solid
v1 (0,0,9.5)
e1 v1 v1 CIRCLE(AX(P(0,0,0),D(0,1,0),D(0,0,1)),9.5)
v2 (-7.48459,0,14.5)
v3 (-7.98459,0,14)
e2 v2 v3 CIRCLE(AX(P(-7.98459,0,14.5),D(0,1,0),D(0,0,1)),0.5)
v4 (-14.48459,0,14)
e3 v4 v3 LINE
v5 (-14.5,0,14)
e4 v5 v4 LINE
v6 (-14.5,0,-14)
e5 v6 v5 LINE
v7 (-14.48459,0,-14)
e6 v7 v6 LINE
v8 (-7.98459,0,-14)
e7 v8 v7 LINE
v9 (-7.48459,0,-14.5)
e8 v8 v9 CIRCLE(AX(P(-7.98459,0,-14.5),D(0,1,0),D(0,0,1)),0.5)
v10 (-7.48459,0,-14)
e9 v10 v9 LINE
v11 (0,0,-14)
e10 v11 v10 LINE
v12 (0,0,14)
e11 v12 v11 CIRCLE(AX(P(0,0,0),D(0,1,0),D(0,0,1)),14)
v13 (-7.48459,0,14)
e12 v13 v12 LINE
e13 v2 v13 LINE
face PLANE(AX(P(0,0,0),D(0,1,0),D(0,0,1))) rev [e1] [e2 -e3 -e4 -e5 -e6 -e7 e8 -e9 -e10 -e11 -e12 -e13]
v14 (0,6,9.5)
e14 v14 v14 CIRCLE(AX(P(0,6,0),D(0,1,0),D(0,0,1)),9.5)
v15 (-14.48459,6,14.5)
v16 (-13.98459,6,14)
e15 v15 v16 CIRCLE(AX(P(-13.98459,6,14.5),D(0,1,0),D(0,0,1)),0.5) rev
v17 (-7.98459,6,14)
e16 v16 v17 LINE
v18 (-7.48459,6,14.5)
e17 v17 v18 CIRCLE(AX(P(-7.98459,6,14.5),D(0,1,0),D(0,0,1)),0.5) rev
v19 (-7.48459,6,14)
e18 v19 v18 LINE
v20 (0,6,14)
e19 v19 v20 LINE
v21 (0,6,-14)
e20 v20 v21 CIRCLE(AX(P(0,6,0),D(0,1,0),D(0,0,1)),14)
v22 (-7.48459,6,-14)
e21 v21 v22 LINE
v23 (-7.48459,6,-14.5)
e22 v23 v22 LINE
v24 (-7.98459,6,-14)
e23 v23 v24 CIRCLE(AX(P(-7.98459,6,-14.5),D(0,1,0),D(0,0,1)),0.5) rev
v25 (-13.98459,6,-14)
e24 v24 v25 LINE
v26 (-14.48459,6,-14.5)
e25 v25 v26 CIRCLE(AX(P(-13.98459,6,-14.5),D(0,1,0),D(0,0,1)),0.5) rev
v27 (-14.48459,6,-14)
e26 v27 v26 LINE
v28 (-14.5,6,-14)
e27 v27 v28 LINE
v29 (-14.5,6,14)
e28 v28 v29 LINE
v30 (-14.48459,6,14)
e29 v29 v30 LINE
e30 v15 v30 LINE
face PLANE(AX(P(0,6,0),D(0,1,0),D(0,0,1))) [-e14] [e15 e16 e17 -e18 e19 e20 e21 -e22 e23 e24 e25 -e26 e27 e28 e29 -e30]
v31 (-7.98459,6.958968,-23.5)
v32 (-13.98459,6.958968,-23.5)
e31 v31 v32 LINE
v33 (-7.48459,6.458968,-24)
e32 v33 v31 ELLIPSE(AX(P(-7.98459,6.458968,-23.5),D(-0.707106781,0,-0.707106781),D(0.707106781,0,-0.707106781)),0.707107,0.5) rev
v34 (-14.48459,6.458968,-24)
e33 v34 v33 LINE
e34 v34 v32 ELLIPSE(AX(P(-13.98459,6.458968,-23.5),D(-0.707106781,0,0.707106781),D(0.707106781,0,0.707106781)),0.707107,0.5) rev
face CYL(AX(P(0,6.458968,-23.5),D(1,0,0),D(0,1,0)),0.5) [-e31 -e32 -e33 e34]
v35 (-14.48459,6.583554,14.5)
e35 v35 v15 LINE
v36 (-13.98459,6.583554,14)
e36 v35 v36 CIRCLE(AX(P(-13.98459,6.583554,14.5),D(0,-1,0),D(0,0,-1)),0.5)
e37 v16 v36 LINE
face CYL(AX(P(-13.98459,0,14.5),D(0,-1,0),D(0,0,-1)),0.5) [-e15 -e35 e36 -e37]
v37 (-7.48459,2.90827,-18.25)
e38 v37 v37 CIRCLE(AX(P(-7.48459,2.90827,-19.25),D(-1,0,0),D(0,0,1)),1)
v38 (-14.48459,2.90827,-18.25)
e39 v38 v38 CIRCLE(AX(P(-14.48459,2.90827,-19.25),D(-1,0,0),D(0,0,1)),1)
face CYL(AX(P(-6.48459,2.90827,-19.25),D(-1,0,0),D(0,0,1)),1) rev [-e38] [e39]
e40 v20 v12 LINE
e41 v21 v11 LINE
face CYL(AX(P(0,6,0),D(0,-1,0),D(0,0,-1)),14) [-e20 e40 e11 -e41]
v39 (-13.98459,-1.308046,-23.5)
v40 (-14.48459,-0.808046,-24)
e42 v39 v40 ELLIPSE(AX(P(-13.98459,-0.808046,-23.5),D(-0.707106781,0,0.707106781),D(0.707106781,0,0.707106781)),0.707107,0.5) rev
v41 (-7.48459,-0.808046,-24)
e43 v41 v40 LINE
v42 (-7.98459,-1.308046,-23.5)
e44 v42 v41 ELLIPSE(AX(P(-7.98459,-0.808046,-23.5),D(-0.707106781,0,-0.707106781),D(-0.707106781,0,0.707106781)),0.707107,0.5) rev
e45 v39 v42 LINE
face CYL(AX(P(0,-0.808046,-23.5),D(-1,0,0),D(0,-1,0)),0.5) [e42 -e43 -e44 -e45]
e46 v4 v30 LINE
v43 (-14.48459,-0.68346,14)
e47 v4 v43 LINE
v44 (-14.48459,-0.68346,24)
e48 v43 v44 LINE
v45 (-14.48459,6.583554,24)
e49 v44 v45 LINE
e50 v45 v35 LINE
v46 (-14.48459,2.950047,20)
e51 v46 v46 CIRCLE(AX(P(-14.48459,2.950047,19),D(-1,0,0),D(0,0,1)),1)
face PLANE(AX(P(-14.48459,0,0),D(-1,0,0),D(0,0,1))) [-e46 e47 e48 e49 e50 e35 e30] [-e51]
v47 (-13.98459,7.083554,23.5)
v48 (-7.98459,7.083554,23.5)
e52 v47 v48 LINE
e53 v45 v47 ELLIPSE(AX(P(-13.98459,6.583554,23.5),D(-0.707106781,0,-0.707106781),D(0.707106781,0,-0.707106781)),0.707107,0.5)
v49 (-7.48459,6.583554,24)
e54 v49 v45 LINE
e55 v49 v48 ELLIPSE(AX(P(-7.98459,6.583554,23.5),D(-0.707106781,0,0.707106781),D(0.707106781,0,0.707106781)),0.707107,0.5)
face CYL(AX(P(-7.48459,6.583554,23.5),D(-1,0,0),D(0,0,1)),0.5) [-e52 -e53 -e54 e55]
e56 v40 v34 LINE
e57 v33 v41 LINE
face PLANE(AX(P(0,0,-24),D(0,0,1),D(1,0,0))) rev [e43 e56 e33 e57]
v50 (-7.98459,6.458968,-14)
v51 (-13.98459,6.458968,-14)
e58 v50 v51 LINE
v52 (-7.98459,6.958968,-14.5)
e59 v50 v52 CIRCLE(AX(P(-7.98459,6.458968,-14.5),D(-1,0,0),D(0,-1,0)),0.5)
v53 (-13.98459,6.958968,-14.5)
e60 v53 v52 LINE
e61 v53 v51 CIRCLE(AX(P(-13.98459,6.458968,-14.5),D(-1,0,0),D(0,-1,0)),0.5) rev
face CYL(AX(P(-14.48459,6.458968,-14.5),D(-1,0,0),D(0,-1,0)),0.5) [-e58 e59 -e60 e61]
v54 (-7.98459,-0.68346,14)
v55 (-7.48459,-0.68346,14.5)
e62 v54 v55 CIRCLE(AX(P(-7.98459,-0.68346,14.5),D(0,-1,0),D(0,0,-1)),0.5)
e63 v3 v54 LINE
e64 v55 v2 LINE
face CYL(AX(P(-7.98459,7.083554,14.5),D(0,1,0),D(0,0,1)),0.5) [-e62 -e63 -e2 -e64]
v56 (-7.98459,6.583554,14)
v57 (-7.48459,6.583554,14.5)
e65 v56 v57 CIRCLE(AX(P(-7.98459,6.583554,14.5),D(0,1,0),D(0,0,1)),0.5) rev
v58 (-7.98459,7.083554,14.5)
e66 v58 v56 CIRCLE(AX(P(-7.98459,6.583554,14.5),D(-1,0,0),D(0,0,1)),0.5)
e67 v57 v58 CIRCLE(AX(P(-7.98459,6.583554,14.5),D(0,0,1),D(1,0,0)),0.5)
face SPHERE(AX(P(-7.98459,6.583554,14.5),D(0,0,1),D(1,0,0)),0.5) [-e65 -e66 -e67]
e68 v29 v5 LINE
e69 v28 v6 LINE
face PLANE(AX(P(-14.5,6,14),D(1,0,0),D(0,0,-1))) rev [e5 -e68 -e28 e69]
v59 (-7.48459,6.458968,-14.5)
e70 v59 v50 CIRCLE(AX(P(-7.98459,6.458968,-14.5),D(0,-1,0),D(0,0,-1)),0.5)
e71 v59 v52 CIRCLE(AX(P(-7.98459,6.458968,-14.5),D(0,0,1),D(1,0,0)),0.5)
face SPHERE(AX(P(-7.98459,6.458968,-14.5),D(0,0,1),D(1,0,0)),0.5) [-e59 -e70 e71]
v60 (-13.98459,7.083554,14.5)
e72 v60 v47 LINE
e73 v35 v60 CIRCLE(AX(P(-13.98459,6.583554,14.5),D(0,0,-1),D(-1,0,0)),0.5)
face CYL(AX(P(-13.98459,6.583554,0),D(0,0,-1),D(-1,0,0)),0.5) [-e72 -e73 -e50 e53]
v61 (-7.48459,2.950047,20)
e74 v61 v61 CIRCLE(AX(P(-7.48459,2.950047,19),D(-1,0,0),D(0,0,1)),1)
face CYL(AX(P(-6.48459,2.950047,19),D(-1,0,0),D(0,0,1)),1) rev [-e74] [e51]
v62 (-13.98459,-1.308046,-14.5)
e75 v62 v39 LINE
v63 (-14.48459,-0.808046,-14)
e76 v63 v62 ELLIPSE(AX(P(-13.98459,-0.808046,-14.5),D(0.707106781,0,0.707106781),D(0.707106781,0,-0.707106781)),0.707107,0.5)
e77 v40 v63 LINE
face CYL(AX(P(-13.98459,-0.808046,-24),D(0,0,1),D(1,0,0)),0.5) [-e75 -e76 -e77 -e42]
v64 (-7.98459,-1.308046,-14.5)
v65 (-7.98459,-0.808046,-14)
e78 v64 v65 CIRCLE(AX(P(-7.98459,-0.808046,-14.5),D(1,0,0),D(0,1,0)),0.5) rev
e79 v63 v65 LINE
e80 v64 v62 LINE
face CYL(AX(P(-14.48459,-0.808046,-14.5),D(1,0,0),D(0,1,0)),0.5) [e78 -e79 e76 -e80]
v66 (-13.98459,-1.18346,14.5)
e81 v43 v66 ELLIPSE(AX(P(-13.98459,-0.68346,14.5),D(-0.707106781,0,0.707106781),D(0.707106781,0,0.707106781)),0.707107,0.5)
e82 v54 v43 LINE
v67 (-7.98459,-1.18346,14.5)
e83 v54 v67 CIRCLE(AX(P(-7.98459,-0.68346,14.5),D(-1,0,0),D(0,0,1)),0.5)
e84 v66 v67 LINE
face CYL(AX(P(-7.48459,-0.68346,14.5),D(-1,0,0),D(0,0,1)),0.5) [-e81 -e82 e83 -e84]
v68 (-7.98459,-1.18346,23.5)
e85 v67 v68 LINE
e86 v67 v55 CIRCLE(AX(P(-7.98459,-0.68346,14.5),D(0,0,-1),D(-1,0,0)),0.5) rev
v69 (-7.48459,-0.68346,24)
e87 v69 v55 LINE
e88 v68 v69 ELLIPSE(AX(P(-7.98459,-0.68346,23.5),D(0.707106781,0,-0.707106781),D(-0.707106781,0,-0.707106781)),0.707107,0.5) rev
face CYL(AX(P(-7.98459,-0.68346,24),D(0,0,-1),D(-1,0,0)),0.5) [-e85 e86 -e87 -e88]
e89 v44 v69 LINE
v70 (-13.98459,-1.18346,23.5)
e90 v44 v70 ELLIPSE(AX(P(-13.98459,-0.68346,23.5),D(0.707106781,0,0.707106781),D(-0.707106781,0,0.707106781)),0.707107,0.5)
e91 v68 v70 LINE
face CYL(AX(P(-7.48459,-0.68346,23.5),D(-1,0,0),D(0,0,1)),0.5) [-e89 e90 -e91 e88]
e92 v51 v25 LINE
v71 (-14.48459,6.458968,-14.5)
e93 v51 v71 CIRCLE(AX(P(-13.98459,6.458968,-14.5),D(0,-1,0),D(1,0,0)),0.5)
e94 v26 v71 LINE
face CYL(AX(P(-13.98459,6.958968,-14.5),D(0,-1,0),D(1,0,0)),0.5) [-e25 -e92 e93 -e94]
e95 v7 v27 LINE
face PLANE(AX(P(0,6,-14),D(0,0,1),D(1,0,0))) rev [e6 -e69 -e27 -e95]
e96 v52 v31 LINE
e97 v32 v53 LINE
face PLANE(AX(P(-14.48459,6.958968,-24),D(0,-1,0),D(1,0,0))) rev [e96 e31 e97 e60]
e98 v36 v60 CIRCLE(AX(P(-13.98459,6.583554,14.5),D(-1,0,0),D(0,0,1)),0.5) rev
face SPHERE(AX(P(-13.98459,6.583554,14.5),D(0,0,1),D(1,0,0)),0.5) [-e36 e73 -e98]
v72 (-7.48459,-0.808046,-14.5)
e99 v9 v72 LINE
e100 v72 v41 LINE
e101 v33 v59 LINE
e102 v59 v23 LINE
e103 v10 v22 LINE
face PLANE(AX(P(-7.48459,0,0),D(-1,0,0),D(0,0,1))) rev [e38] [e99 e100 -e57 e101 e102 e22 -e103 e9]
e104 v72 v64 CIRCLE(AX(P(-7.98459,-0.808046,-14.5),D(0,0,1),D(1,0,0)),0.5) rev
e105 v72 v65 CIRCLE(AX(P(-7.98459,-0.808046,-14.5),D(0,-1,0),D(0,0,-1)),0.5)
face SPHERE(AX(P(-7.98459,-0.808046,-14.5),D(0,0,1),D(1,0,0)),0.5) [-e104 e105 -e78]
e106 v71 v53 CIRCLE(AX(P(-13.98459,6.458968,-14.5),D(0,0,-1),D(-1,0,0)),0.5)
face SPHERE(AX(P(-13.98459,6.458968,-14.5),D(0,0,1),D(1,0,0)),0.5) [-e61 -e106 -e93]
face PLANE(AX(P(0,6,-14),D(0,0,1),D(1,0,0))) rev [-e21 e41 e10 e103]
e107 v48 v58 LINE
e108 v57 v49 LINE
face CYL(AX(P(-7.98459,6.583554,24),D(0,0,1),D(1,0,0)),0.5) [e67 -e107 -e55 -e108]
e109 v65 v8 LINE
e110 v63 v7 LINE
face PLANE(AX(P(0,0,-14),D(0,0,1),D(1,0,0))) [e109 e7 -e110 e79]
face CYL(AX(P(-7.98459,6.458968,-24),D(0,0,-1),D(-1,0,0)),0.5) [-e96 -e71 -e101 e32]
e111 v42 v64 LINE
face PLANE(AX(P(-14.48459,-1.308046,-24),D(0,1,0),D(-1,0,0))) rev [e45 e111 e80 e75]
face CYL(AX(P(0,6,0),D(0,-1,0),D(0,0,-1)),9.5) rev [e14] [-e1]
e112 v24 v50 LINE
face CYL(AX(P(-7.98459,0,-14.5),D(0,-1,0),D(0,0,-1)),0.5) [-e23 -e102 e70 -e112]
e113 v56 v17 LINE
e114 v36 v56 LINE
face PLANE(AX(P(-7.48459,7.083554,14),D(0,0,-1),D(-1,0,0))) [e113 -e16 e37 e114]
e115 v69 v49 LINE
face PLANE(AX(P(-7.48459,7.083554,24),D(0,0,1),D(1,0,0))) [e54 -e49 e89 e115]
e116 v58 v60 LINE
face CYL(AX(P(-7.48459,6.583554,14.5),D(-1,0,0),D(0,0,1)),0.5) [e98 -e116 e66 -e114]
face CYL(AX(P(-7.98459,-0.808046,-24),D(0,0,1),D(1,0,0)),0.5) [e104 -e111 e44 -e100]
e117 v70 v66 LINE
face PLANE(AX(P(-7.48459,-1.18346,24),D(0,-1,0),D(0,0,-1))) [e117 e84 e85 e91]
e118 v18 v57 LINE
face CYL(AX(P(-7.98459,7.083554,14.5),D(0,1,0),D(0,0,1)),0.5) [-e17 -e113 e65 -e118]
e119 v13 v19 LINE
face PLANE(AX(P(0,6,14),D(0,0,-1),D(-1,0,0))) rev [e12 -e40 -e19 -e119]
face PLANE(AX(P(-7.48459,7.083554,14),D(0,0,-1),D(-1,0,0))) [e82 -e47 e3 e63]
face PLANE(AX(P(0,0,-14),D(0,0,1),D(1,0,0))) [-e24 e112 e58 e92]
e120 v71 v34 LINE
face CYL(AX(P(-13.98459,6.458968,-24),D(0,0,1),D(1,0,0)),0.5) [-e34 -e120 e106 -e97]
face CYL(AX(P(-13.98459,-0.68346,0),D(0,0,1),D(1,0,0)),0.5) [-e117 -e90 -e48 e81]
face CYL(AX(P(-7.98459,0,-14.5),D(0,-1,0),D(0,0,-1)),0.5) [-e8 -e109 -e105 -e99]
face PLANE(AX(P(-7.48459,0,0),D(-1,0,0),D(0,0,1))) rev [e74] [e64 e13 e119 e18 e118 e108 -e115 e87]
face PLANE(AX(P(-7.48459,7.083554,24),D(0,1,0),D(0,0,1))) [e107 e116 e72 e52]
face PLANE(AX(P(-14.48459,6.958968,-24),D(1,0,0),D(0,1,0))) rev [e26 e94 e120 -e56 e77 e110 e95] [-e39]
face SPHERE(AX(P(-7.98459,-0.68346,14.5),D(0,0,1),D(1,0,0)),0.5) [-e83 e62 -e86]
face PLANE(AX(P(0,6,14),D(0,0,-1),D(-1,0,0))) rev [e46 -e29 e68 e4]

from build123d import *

# Parameters (mm, degrees)
SKETCH1_R           = 9.5
BOSS_EXTRUDE1_DEPTH = 6
SKETCH4_W           = 6.667748921
SKETCH4_H           = 8.267013878
BOSS_EXTRUDE2_DEPTH = 10
SKETCH6_W           = 10
SKETCH6_H           = 8.267013878
BOSS_EXTRUDE3_DEPTH = 7
FILLET7_R           = 0.5
FILLET9_R           = 0.5
FILLET10_R          = 0.5
FILLET12_R          = 0.5
FILLET13_R          = 0.5
SKETCH7_R           = 1
CUT_EXTRUDE1_DEPTH  = 8
SKETCH8_R           = 1
CUT_EXTRUDE2_DEPTH  = 8


with BuildPart() as part:
    # Sketch1 → Boss-Extrude1 (new body)
    with BuildSketch(Plane(origin=(0, 0, 0), x_dir=(1, 0, 0), z_dir=(0, 1, 0))):
        with BuildLine():
            Line((0, -14), (-14.5, -14))
            Line((-14.5, -14), (-14.5, 14))
            Line((-14.5, 14), (0, 14))
            ThreePointArc((0, 14), (14, 0), (0, -14))
        make_face()
        with Locations(Location((0, 0, 0), (0, 0, 270))):
            Circle(SKETCH1_R, mode=Mode.SUBTRACT)
    extrude(amount=BOSS_EXTRUDE1_DEPTH)

    # Sketch4 → Boss-Extrude2 (add)
    with BuildSketch(Plane(origin=(0, 0, -14), x_dir=(-1, 0, 0), z_dir=(0, 0, -1))):
        with Locations((11.150715383, 2.825461015)):
            Rectangle(SKETCH4_W, SKETCH4_H)
    extrude(amount=BOSS_EXTRUDE2_DEPTH)

    # Sketch6 → Boss-Extrude3 (add)
    with BuildSketch(Plane.ZY.offset(14.484589844)):
        with Locations((-19, 2.825461015)):
            Rectangle(SKETCH6_W, SKETCH6_H)
        with Locations((19, 2.950047349)):
            Rectangle(SKETCH6_W, SKETCH6_H)
    extrude(amount=-BOSS_EXTRUDE3_DEPTH)

    # Fillet7
    fillet7_edges = [part.edges().sort_by_distance(p)[0] for p in [
        (-10.984589844, -1.18345959, 14),
        (-7.484589844, -1.18345959, 19),
        (-10.984589844, -1.18345959, 24),
        (-14.484589844, -1.18345959, 19),
    ]]
    fillet(fillet7_edges, radius=FILLET7_R)

    # Fillet9
    # the kernel refuses this fillet: 0.5 mm, written as the material it takes off along each edge
    with BuildSketch(Plane(origin=(-7.984589844, -0.68345959, 14.5), x_dir=(1, 0, 0), z_dir=(0, 0, -1))) as fillet9_piece_1_section:
        Polygon((0, 0), (FILLET9_R * 1.02, 0), (FILLET9_R * 1.02, FILLET9_R * 1.02), (0, FILLET9_R * 1.02), align=None)
    fillet9_piece_1 = extrude(amount=FILLET9_R * 1.02, mode=Mode.PRIVATE)
    fillet9_piece_1 = fillet9_piece_1 - Plane(origin=(-7.984589844, -0.68345959, 14.5), x_dir=(-0.7071067811865475, 0.7071067811865475, 0), z_dir=(0, 0, -1)) * Sphere(FILLET9_R, mode=Mode.PRIVATE)
    add(fillet9_piece_1, mode=Mode.SUBTRACT)
    with BuildSketch(Plane(origin=(-7.484589844, 0, 14), x_dir=(-1, 0, 0), z_dir=(0, -1, 0))) as fillet9_piece_2:
        with BuildLine():
            CenterArc((FILLET9_R, -FILLET9_R), FILLET9_R, 90, 90)
            Line((0, -FILLET9_R), (0, 0))
            Line((0, 0), (FILLET9_R, 0))
        make_face()
    extrude(amount=0.68345959, mode=Mode.SUBTRACT)
    with BuildSketch(Plane(origin=(-15.734589844, 7.083554288, 14), x_dir=(0, -1, 0), z_dir=(1, 0, 0))) as fillet9_piece_3:
        with BuildLine():
            CenterArc((FILLET9_R, -FILLET9_R), FILLET9_R, 90, 90)
            Line((0, -FILLET9_R), (0, 0))
            Line((0, 0), (FILLET9_R, 0))
        make_face()
    extrude(amount=9.5, mode=Mode.SUBTRACT)
    with BuildSketch(Plane(origin=(-7.484589844, 8.333554288, 14), x_dir=(-1, 0, 0), z_dir=(0, -1, 0)), Plane(origin=(-14.484589844, 8.333554288, 14), x_dir=(0, 0, 1), z_dir=(0, -1, 0))) as fillet9_piece_4:
        with BuildLine():
            CenterArc((FILLET9_R, -FILLET9_R), FILLET9_R, 90, 90)
            Line((0, -FILLET9_R), (0, 0))
            Line((0, 0), (FILLET9_R, 0))
        make_face()
    extrude(amount=2.333554288, mode=Mode.SUBTRACT)

    # Fillet10
    # the kernel refuses this fillet: 0.5 mm, written as the material it takes off along each edge
    with BuildSketch(Plane(origin=(-13.984589844, 6.583554288, 14.5), x_dir=(0, 1, 0), z_dir=(-1, 0, 0))) as fillet10_piece_1_section:
        Polygon((0, 0), (FILLET10_R, 0), (FILLET10_R, FILLET10_R), (0, FILLET10_R), align=None)
    fillet10_piece_1 = extrude(amount=FILLET10_R, mode=Mode.PRIVATE)
    fillet10_piece_1 = fillet10_piece_1 - Plane(origin=(-13.984589844, 6.583554288, 14.5), x_dir=(0, -0.7071067811865475, 0.7071067811865475), z_dir=(-1, 0, 0)) * Sphere(FILLET10_R, mode=Mode.PRIVATE)
    add(fillet10_piece_1, mode=Mode.SUBTRACT)
    with BuildSketch(Plane(origin=(-7.984589844, 6.583554288, 14.5), x_dir=(1, 0, 0), z_dir=(0, 1, 0))) as fillet10_piece_2_section:
        Polygon((0, 0), (FILLET10_R, 0), (FILLET10_R, FILLET10_R), (0, FILLET10_R), align=None)
    fillet10_piece_2 = extrude(amount=FILLET10_R, mode=Mode.PRIVATE)
    fillet10_piece_2 = fillet10_piece_2 - Plane(origin=(-7.984589844, 6.583554288, 14.5), x_dir=(-0.7071067811865475, 0, 0.7071067811865475), z_dir=(0, 1, 0)) * Sphere(FILLET10_R, mode=Mode.PRIVATE)
    add(fillet10_piece_2, mode=Mode.SUBTRACT)
    with BuildSketch(Plane(origin=(-14.484589844, -1.308045924, -12.75), x_dir=(0, 1, 0), z_dir=(0, 0, -1))) as fillet10_piece_3:
        with BuildLine():
            CenterArc((FILLET10_R, FILLET10_R), FILLET10_R, 180, 90)
            Line((0, FILLET10_R), (0, 0))
            Line((0, 0), (FILLET10_R, 0))
        make_face()
    extrude(amount=12.5, mode=Mode.SUBTRACT)
    with BuildSketch(Plane(origin=(-15.734589844, -1.308045924, -14), x_dir=(0, 1, 0), z_dir=(1, 0, 0)), Plane(origin=(-15.734589844, -1.308045924, -24), x_dir=(0, 0, 1), z_dir=(1, 0, 0)), Plane(origin=(-15.734589844, 7.083554288, 24), x_dir=(0, 0, -1), z_dir=(1, 0, 0))) as fillet10_piece_4:
        with BuildLine():
            CenterArc((FILLET10_R, -FILLET10_R), FILLET10_R, 90, 90)
            Line((0, -FILLET10_R), (0, 0))
            Line((0, 0), (FILLET10_R, 0))
        make_face()
    extrude(amount=9.5, mode=Mode.SUBTRACT)
    with BuildSketch(Plane(origin=(-7.484589844, -1.308045924, -12.75), x_dir=(0, 1, 0), z_dir=(0, 0, -1))) as fillet10_piece_5:
        with BuildLine():
            CenterArc((FILLET10_R, -FILLET10_R), FILLET10_R, 90, 90)
            Line((0, -FILLET10_R), (0, 0))
            Line((0, 0), (FILLET10_R, 0))
        make_face()
    extrude(amount=12.5, mode=Mode.SUBTRACT)
    with BuildSketch(Plane(origin=(-7.484589844, 7.083554288, 25.25), x_dir=(-1, 0, 0), z_dir=(0, 0, -1)), Plane(origin=(-14.484589844, 7.083554288, 25.25), x_dir=(0, -1, 0), z_dir=(0, 0, -1))) as fillet10_piece_6:
        with BuildLine():
            CenterArc((FILLET10_R, -FILLET10_R), FILLET10_R, 90, 90)
            Line((0, -FILLET10_R), (0, 0))
            Line((0, 0), (FILLET10_R, 0))
        make_face()
    extrude(amount=10.75, mode=Mode.SUBTRACT)

    # Fillet12
    # the kernel refuses this fillet: 0.5 mm, written as the material it takes off along each edge
    with BuildSketch(Plane(origin=(-7.984589844, -0.808045924, -14.5), x_dir=(1, 0, 0), z_dir=(0, 0, 1))) as fillet12_piece_1_section:
        Polygon((0, 0), (FILLET12_R * 1.02, 0), (FILLET12_R * 1.02, -FILLET12_R * 1.02), (0, -FILLET12_R * 1.02), align=None)
    fillet12_piece_1 = extrude(amount=FILLET12_R * 1.02, mode=Mode.PRIVATE)
    fillet12_piece_1 = fillet12_piece_1 - Plane(origin=(-7.984589844, -0.808045924, -14.5), x_dir=(-0.7071067811865475, 0.7071067811865476, 0), z_dir=(0, 0, 1)) * Sphere(FILLET12_R, mode=Mode.PRIVATE)
    add(fillet12_piece_1, mode=Mode.SUBTRACT)
    with BuildSketch(Plane(origin=(-7.484589844, 0, -14), x_dir=(-1, 0, 0), z_dir=(0, -1, 0))) as fillet12_piece_2:
        with BuildLine():
            CenterArc((FILLET12_R, FILLET12_R), FILLET12_R, 180, 90)
            Line((0, FILLET12_R), (0, 0))
            Line((0, 0), (FILLET12_R, 0))
        make_face()
    extrude(amount=0.808045924, mode=Mode.SUBTRACT)
    with BuildSketch(Plane(origin=(-14.484589844, 6, -14), x_dir=(1, 0, 0), z_dir=(0, 1, 0)), Plane(origin=(-7.484589844, 8.208967954, -14), x_dir=(-1, 0, 0), z_dir=(0, -1, 0))) as fillet12_piece_3:
        with BuildLine():
            CenterArc((FILLET12_R, FILLET12_R), FILLET12_R, 180, 90)
            Line((0, FILLET12_R), (0, 0))
            Line((0, 0), (FILLET12_R, 0))
        make_face()
    extrude(amount=2.208967954, mode=Mode.SUBTRACT)
    with BuildSketch(Plane(origin=(-6.234589844, 6.958967954, -14), x_dir=(0, -1, 0), z_dir=(-1, 0, 0))) as fillet12_piece_4:
        with BuildLine():
            CenterArc((FILLET12_R, -FILLET12_R), FILLET12_R, 90, 90)
            Line((0, -FILLET12_R), (0, 0))
            Line((0, 0), (FILLET12_R, 0))
        make_face()
    extrude(amount=9.5, mode=Mode.SUBTRACT)

    # Fillet13
    # the kernel refuses this fillet: 0.5 mm, written as the material it takes off along each edge
    with BuildSketch(Plane(origin=(-13.984589844, 6.458967954, -14.5), x_dir=(0, 1, 0), z_dir=(-1, 0, 0))) as fillet13_piece_1_section:
        Polygon((0, 0), (FILLET13_R, 0), (FILLET13_R, -FILLET13_R), (0, -FILLET13_R), align=None)
    fillet13_piece_1 = extrude(amount=FILLET13_R, mode=Mode.PRIVATE)
    fillet13_piece_1 = fillet13_piece_1 - Plane(origin=(-13.984589844, 6.458967954, -14.5), x_dir=(0, -0.7071067811865475, -0.7071067811865475), z_dir=(-1, 0, 0)) * Sphere(FILLET13_R, mode=Mode.PRIVATE)
    add(fillet13_piece_1, mode=Mode.SUBTRACT)
    with BuildSketch(Plane(origin=(-7.984589844, 6.458967954, -14.5), x_dir=(0, 1, 0), z_dir=(1, 0, 0))) as fillet13_piece_2_section:
        Polygon((0, 0), (FILLET13_R, 0), (FILLET13_R, FILLET13_R), (0, FILLET13_R), align=None)
    fillet13_piece_2 = extrude(amount=FILLET13_R, mode=Mode.PRIVATE)
    fillet13_piece_2 = fillet13_piece_2 - Plane(origin=(-7.984589844, 6.458967954, -14.5), x_dir=(0, -0.7071067811865475, -0.7071067811865475), z_dir=(1, 0, 0)) * Sphere(FILLET13_R, mode=Mode.PRIVATE)
    add(fillet13_piece_2, mode=Mode.SUBTRACT)
    with BuildSketch(Plane(origin=(-7.484589844, 6.958967954, -25.25), x_dir=(0, -1, 0), z_dir=(0, 0, 1)), Plane(origin=(-14.484589844, 6.958967954, -14.5), x_dir=(0, -1, 0), z_dir=(0, 0, -1))) as fillet13_piece_3:
        with BuildLine():
            CenterArc((FILLET13_R, -FILLET13_R), FILLET13_R, 90, 90)
            Line((0, -FILLET13_R), (0, 0))
            Line((0, 0), (FILLET13_R, 0))
        make_face()
    extrude(amount=10.75, mode=Mode.SUBTRACT)
    with BuildSketch(Plane(origin=(-6.234589844, 6.958967954, -24), x_dir=(0, 0, 1), z_dir=(-1, 0, 0))) as fillet13_piece_4:
        with BuildLine():
            CenterArc((FILLET13_R, -FILLET13_R), FILLET13_R, 90, 90)
            Line((0, -FILLET13_R), (0, 0))
            Line((0, 0), (FILLET13_R, 0))
        make_face()
    extrude(amount=9.5, mode=Mode.SUBTRACT)

    # Sketch7 → Cut-Extrude1 (cut)
    with BuildSketch(Plane.ZY.offset(14.484589844)):
        with Locations((-19.25, 2.908270205)):
            Circle(SKETCH7_R)
    extrude(amount=-CUT_EXTRUDE1_DEPTH, mode=Mode.SUBTRACT)

    # Sketch8 → Cut-Extrude2 (cut)
    with BuildSketch(Plane.ZY.offset(14.484589844)):
        with Locations((19, 2.950047349)):
            Circle(SKETCH8_R)
    extrude(amount=-CUT_EXTRUDE2_DEPTH, mode=Mode.SUBTRACT)


solid = part.part
